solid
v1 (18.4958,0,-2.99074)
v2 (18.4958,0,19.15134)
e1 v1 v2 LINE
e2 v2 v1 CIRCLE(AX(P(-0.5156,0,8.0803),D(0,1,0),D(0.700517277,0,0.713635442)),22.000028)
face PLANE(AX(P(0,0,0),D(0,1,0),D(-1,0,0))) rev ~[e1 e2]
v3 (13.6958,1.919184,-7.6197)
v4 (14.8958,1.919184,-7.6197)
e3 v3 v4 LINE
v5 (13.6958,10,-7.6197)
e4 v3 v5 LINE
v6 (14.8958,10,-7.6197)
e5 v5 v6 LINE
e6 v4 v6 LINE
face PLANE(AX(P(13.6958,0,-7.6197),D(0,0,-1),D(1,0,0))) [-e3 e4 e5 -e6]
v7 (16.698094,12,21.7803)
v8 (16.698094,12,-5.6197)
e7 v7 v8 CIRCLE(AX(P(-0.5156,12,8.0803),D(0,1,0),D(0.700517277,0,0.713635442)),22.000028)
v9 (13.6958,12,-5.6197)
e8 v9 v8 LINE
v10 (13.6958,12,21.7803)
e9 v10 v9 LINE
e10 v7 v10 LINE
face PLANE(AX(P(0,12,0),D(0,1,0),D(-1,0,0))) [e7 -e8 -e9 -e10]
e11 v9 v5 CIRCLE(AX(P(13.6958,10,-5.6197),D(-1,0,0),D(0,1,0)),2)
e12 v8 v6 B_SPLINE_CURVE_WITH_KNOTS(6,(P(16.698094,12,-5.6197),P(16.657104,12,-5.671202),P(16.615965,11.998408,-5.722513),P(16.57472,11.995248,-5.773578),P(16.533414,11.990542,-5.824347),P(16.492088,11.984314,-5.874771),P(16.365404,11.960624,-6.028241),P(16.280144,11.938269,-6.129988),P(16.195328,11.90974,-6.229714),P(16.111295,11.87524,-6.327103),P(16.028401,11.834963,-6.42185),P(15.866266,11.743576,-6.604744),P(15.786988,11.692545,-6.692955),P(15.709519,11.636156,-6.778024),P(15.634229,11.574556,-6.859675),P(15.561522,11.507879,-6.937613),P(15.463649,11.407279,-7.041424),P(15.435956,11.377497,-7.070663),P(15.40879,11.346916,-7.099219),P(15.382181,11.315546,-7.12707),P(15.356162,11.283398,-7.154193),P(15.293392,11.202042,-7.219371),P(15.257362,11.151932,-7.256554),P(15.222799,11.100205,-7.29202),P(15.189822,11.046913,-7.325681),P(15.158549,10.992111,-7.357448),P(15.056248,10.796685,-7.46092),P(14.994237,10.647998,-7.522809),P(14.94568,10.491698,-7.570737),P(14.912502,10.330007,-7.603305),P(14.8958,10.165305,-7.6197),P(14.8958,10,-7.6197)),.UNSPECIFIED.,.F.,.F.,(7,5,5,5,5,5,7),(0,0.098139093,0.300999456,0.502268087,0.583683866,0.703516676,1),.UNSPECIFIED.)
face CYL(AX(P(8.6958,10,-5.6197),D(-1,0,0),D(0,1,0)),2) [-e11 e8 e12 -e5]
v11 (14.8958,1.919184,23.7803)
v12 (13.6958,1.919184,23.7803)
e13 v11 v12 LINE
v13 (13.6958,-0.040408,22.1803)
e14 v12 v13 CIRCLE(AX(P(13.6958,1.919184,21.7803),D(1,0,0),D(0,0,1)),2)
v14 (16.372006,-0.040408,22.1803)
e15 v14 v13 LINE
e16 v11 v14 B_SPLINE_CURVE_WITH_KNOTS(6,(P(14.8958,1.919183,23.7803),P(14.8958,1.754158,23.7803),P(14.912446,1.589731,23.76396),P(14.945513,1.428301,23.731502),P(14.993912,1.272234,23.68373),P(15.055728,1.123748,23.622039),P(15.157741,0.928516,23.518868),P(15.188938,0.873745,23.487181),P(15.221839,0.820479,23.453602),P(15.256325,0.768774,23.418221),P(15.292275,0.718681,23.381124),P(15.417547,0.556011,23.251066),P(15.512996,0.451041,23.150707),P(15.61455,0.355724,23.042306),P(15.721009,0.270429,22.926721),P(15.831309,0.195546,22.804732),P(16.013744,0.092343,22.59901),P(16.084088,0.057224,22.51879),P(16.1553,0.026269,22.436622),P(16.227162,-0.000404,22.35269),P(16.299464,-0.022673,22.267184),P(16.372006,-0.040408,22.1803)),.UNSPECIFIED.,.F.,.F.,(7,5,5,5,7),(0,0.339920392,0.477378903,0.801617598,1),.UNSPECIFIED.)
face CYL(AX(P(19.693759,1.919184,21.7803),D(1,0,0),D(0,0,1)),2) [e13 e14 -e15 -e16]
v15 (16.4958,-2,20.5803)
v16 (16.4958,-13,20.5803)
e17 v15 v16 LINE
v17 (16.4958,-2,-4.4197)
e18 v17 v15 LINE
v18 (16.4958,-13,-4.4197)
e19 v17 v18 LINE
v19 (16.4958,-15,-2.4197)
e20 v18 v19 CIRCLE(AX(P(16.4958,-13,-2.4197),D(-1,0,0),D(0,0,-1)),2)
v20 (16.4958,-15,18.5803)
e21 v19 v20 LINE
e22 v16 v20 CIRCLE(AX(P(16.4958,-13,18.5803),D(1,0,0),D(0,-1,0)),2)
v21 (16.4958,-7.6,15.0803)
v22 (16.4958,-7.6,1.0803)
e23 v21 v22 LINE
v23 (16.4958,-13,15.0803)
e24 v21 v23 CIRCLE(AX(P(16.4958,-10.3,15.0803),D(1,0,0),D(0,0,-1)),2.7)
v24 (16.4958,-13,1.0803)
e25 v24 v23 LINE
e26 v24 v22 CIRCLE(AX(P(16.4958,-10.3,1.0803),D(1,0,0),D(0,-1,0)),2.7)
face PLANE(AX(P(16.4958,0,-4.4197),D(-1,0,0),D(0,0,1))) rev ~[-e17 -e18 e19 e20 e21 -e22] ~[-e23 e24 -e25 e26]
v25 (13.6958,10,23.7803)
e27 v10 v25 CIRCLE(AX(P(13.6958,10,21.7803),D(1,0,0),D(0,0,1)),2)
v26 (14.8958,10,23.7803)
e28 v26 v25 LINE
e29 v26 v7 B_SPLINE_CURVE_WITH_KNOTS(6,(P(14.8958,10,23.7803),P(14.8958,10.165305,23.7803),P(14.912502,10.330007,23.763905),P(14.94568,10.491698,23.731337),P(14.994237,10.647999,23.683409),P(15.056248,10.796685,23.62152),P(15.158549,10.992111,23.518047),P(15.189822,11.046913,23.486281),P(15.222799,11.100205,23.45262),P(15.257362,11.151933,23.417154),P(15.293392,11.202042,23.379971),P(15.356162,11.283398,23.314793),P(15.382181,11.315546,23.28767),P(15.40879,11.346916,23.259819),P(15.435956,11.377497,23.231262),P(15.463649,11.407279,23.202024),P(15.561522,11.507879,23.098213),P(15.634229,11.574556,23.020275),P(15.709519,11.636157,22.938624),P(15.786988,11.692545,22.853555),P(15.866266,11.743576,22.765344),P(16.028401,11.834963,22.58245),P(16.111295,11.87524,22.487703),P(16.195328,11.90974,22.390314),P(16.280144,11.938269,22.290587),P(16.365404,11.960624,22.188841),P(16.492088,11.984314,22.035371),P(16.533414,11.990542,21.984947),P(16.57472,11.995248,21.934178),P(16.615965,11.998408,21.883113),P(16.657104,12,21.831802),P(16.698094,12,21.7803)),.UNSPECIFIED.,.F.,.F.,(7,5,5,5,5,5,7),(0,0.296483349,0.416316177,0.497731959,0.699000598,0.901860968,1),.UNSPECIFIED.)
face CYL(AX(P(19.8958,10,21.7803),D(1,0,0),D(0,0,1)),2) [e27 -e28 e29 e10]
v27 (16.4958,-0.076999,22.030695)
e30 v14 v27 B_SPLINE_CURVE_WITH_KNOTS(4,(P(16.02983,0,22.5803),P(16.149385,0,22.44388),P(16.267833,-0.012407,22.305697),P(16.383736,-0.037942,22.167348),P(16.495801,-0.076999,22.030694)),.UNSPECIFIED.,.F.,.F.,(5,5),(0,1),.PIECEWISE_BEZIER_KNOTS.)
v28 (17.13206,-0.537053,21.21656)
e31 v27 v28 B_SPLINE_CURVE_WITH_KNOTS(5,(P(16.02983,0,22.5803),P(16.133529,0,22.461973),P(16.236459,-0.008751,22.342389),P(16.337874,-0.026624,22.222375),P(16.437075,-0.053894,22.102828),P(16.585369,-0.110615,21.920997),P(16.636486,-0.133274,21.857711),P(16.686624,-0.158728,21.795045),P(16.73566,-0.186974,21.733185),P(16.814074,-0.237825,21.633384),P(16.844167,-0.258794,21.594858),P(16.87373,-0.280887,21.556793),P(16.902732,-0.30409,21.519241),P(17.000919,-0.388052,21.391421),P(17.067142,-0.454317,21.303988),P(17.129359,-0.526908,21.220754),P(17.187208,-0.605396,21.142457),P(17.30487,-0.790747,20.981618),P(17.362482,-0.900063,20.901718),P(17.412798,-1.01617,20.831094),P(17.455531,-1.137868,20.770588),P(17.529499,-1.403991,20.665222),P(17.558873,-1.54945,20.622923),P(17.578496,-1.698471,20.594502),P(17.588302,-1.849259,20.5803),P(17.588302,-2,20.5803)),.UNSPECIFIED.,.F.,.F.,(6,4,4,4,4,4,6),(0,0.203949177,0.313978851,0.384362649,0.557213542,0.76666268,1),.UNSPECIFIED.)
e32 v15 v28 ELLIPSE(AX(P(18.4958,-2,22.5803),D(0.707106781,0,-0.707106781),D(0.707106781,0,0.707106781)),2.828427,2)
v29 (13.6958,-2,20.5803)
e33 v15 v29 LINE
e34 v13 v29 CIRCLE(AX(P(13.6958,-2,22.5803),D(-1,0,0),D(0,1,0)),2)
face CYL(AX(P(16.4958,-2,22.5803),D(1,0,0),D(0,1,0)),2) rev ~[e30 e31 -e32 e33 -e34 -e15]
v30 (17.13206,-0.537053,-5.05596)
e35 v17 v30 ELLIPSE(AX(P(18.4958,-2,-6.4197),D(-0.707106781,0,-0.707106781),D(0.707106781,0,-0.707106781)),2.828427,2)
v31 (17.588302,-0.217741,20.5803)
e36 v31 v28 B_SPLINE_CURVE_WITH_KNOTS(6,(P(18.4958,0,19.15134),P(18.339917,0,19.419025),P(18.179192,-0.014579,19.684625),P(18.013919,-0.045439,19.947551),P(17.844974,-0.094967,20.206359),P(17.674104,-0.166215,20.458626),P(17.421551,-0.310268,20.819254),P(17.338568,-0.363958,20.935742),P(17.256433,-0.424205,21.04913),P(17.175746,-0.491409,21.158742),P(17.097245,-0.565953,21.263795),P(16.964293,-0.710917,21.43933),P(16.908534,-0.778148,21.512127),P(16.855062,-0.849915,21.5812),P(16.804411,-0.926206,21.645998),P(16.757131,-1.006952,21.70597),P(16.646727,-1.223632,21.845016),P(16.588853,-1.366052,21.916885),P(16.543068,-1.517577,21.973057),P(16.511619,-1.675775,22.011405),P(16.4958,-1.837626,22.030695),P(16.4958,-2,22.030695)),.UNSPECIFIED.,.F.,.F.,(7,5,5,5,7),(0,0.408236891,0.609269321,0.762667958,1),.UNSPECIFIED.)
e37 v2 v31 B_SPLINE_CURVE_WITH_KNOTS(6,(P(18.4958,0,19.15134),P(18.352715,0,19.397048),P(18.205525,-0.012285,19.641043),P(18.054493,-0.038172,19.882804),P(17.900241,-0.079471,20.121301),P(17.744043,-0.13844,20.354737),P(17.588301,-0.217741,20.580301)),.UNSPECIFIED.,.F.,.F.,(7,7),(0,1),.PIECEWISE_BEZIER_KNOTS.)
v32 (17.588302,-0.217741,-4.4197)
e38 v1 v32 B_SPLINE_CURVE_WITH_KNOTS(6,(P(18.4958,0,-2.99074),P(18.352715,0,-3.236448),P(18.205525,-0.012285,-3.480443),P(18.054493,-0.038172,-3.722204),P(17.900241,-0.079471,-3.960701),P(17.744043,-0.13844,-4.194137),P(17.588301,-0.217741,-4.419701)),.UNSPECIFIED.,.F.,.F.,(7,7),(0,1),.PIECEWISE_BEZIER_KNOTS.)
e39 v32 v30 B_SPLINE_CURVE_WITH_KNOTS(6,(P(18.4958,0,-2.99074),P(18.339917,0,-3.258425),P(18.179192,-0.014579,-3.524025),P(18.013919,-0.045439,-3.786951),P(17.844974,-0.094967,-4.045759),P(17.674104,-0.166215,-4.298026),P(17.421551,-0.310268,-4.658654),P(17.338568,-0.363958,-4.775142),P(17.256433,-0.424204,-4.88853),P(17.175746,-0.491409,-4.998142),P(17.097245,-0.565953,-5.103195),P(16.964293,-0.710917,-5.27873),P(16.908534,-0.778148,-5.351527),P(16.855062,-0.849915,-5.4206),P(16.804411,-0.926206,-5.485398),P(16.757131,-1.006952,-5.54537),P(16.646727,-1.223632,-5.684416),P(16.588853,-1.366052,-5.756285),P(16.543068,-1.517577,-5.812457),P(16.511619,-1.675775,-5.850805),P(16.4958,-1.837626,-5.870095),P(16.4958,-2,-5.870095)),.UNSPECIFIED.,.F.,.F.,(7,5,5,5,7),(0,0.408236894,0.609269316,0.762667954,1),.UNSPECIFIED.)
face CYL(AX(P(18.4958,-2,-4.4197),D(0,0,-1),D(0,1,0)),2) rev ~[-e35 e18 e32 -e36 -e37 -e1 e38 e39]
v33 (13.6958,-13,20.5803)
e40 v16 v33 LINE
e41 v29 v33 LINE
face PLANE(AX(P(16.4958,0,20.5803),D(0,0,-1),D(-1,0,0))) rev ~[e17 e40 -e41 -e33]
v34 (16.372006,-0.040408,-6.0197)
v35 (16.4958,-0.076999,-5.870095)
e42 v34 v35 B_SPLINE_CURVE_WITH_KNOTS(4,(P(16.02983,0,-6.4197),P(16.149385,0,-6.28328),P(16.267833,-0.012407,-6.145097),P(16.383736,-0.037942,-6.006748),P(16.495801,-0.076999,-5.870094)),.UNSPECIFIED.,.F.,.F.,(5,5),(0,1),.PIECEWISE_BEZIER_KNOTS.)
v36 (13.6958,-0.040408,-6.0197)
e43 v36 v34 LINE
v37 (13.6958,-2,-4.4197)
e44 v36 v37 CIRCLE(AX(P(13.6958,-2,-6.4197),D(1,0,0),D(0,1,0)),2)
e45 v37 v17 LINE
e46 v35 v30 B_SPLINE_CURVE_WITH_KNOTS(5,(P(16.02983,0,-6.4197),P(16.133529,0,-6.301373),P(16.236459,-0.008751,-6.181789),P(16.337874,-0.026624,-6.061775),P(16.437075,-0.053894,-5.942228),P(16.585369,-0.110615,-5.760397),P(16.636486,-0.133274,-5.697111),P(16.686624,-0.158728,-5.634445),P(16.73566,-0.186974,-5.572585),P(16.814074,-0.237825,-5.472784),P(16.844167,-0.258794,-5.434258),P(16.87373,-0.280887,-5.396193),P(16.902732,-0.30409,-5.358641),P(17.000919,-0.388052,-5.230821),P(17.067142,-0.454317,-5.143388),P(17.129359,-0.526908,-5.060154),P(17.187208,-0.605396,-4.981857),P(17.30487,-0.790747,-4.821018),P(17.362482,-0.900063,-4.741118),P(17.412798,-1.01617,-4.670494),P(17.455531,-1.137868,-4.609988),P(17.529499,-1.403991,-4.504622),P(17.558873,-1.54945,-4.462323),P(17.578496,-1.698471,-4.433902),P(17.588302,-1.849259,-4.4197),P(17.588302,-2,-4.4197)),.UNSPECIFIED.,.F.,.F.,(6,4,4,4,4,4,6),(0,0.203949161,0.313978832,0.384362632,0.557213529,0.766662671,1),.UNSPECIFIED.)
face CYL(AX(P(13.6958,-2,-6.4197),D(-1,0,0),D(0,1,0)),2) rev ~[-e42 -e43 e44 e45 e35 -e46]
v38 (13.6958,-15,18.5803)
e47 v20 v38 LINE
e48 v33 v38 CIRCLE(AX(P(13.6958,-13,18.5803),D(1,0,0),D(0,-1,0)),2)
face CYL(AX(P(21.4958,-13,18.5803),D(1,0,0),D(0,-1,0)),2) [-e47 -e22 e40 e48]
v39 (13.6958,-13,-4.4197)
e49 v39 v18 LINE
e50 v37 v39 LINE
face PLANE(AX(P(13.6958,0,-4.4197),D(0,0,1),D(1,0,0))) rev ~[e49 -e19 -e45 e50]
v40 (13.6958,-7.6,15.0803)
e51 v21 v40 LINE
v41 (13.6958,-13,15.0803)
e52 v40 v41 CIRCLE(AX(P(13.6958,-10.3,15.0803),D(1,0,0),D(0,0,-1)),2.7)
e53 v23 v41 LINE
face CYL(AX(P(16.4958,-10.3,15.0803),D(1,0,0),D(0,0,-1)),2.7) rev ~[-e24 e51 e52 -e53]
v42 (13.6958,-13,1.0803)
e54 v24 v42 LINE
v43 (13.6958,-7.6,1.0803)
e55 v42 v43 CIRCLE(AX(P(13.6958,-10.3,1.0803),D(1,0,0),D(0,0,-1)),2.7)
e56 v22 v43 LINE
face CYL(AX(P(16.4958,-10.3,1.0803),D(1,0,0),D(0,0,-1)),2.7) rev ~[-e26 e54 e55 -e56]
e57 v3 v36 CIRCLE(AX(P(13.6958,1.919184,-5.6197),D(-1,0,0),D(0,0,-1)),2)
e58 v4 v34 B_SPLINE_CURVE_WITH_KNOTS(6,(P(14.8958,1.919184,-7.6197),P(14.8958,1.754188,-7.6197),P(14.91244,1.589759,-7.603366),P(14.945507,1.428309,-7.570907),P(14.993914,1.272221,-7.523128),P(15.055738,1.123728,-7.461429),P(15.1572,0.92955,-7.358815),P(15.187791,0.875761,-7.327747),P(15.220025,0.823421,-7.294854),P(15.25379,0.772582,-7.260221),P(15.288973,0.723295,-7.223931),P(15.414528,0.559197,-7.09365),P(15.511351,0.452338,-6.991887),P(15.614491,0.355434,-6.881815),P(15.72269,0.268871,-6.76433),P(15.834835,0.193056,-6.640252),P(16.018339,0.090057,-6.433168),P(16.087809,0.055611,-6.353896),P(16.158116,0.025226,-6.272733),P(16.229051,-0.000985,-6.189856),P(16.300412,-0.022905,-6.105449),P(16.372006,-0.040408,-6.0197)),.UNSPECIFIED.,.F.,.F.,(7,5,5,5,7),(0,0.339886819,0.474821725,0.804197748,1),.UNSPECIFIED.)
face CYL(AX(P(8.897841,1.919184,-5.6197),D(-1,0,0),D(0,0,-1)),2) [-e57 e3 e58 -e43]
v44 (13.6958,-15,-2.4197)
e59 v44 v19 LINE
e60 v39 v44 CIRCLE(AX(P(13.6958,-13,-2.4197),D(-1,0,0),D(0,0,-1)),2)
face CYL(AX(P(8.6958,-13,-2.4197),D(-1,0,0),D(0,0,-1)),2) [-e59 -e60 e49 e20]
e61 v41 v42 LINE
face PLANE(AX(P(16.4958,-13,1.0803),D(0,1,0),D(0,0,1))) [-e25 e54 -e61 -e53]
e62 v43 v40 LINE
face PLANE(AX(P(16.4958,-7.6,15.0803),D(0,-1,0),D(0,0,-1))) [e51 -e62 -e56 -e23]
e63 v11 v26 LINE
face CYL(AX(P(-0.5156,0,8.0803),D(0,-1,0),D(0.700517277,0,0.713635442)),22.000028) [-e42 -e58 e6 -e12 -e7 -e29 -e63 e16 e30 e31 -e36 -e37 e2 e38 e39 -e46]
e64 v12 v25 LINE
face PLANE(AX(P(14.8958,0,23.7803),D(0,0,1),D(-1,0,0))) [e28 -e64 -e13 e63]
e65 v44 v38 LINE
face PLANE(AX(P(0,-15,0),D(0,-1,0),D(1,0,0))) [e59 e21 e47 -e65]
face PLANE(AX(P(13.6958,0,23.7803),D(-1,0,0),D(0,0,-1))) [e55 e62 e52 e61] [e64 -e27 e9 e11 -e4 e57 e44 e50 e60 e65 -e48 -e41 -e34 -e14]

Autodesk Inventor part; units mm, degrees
ref_plane "YZ Plane" through (0, 0, 0) normal (1, 0, 0) x (0, 1, 0)
ref_plane "XZ Plane" through (0, 0, 0) normal (0, 1, 0) x (-1, 0, 0)
ref_plane "XY Plane" through (0, 0, 0) normal (0, 0, 1) x (1, 0, 0)
sketch "Boceto1" plane through (0, 0, 0) normal (0, 1, 0) x (-1, 0, 0)
  line L0 (-14.8958, 23.7803) -> (7.8042, 23.7803)
  line L1 (7.8042, 23.7803) -> (7.8042, -7.6197)
  line L2 (7.8042, -7.6197) -> (-14.8958, -7.6197)
  line L3 (-14.8958, -7.6197) -> (-14.8958, 23.7803)
  line L4 (-14.8958, 23.7803) -> (7.8042, -7.6197) construction
  line L5 (7.8042, 23.7803) -> (-14.8958, -7.6197) construction
  arc A0 (-14.8958, 23.7803) -> (-14.8958, -7.6197) centre (0.5156, 8.0803) ccw
  line L6 (7.8042, 17.8112) -> (7.8042, 23.7803)
  line L7 (-13.6958, 20.5803) -> (6.6042, 20.5803)
  line L8 (6.6042, 20.5803) -> (6.6042, -4.4197)
  line L9 (6.6042, -4.4197) -> (-13.6958, -4.4197)
  line L10 (-13.6958, -4.4197) -> (-13.6958, 20.5803)
  line L11 (-13.6958, 20.5803) -> (6.6042, -4.4197) construction
  line L12 (6.6042, 20.5803) -> (-13.6958, -4.4197) construction
  line L13 (7.8042, 23.7803) -> (11.6042, 23.7803)
  line L14 (11.6042, 23.7803) -> (11.6042, -7.6197)
  line L15 (11.6042, -7.6197) -> (7.8042, -7.6197)
  line L16 (7.8042, -7.6197) -> (7.8042, 23.7803)
  line L17 (7.8042, 23.7803) -> (6.6042, 23.7803)
  line L18 (6.6042, 23.7803) -> (6.6042, -7.6197)
  line L19 (6.6042, -7.6197) -> (7.8042, -7.6197)
  line L20 (7.8042, -7.6197) -> (7.8042, 23.7803)
  line L21 (11.6042, -7.6197) -> (6.6042, -7.6197)
  line L22 (6.6042, -7.6197) -> (6.6042, -4.4197)
  line L23 (6.6042, -4.4197) -> (11.6042, -4.4197)
  line L24 (11.6042, -4.4197) -> (11.6042, -7.6197)
  line L25 (11.6042, 23.7803) -> (6.6042, 23.7803)
  line L26 (6.6042, 23.7803) -> (6.6042, 20.5803)
  line L27 (6.6042, 20.5803) -> (11.6042, 20.5803)
  line L28 (11.6042, 20.5803) -> (11.6042, 23.7803)
  line L29 (-14.8958, 23.7803) -> (-13.6958, 23.7803)
  line L30 (-13.6958, 23.7803) -> (-13.6958, -7.6197)
  line L31 (-13.6958, -7.6197) -> (-14.8958, -7.6197)
  line L32 (-14.8958, -7.6197) -> (-14.8958, 23.7803)
  point P0 (-3.5458, 8.0803)
  point P1 (6.6042, -4.4197)
  point P2 (6.6042, 20.5803)
  point P3 (6.6042, 23.7803)
  point P4 (6.6042, 20.5803)
  point P5 (11.6042, -4.4197)
  point P6 (6.6042, -4.4197)
  dimension "d4" = 25
  dimension "d5" = 3.2
  dimension "d6" = 1.2
  dimension "d7" = 20.3
  dimension "d14" = 5
  dimension "d34" = 22
extrude "Extrusión1" add sketch "Boceto1" along normal blind 12 contours L0 L30 L10 L2 L3 | L3 A0
sketch "Boceto3" plane through (0, 0, 0) normal (0, -1, 0) x (1, 0, 0)
  line L0 (10.8958, -4.4197) -> (16.4958, -4.4197)
  line L1 (16.4958, -4.4197) -> (16.4958, 20.5803)
  line L2 (16.4958, 20.5803) -> (10.8958, 20.5803)
  line L3 (10.8958, 20.5803) -> (10.8958, -4.4197)
  line L4 (13.6958, -7.6197) -> (13.6958, 23.7803) projected
  line L5 (10.8958, -4.4197) -> (16.4958, 20.5803) construction
  line L6 (16.4958, -4.4197) -> (10.8958, 20.5803) construction
  point P0 (0, 0)
  point P1 (13.6958, 8.0803)
  point P2 (13.6958, 20.5803)
  point P3 (13.6958, -4.4197)
  dimension "d18" = 25
  dimension "d19" = 2.8
extrude "Extrusión3" add sketch "Boceto3" along normal blind 15 contours L4 L2 L1 L0
fillet "Empalme2" radius 2 9 edges at (15.0958, 0, 20.5803) (15.0958, -15, 20.5803) (15.0958, -15, -4.4197) (15.0958, 0, -4.4197) (14.2958, 0, -7.6197) (14.2958, 12, -7.6197) (14.2958, 0, 23.7803) (14.2958, 12, 23.7803) (16.4958, 0, 8.0803)
sketch "Boceto4" plane through (16.4958, -13, -4.4197) normal (1, 0, 0) x (0, 0, -1)
  circle A0 centre (-19.5, 2.7) radius 2.7
  circle A1 centre (-5.5, 2.7) radius 2.7
  line L0 (-19.5, 5.4) -> (-5.5, 5.4)
  line L1 (-5.5, 5.4) -> (-5.5, 0)
  line L2 (-5.5, 0) -> (-19.5, 0)
  line L3 (-19.5, 0) -> (-19.5, 5.4)
  line L4 (-25, 11) -> (-25, 0) projected
  line L5 (0, 11) -> (0, 0) projected
  line L6 (-2, -2) -> (-23, -2) projected
  point P0 (-4.4197, 13)
  point P1 (-5.5, 0)
  point P2 (-5.5, 5.4)
  point P3 (-19.5, 5.4)
  dimension "d23" = 5.4
  dimension "d24" = 5.5
  dimension "d25" = 5.5
  dimension "d26" = 2
extrude "Extrusión4" cut sketch "Boceto4" against normal through all
sketch "Boceto5" plane through (16.4958, -13, -4.4197) normal (1, 0, 0) x (0, 0, -1)
  arc A0 (-5.5, 0) -> (-5.5, 5.4) centre (-5.5, 2.7) ccw projected
  line L0 (-5.5, 0) -> (-19.5, 0) projected
  arc A1 (-19.5, 5.4) -> (-19.5, 0) centre (-19.5, 2.7) ccw projected
  line L1 (-19.5, 5.4) -> (-5.5, 5.4) projected
  arc A2 (-2, -2) -> (0, 0) centre (-2, 0) ccw projected
  line L2 (0, 11) -> (0, 0) projected
  line L3 (-25, 11) -> (0, 11) projected
  line L4 (-25, 11) -> (-25, 0) projected
  arc A3 (-25, 0) -> (-23, -2) centre (-23, 0) ccw projected
  line L5 (-2, -2) -> (-23, -2) projected
  arc A4 (-5.5, -2) -> (-5.5, 7.4) centre (-5.5, 2.7) ccw
  line L6 (-5.5, -2) -> (-19.5, -2)
  arc A5 (-19.5, 7.4) -> (-19.5, -2) centre (-19.5, 2.7) ccw
  line L7 (-19.5, 7.4) -> (-5.5, 7.4)
  point P0 (-4.4197, 13)
  point P1 (-21.3974, 7)
  point P2 (-19.5, -2)
  point P3 (-5.5, -2)
  point P4 (-3.6026, 7)
  dimension "d29" = 2
sketch "Boceto2" plane through (-6.6042, 0, 23.7803) normal (0, 0, 1) x (1, 0, 0)
  circle A0 centre (2.3, 6) radius 2.7
  line L0 (-5, 0) -> (21.5, 0) projected
  circle A1 centre (10.3, 6) radius 2.7
  line L1 (2.3, 3.3) -> (10.3, 3.3)
  line L2 (10.3, 3.3) -> (10.3, 8.7)
  line L3 (10.3, 8.7) -> (2.3, 8.7)
  line L4 (2.3, 8.7) -> (2.3, 3.3)
  point P0 (6.6042, 0)
  point P1 (20.3, 0)
  dimension "d10" = 5.4
  dimension "d11" = 6
  dimension "d12" = 10
  dimension "d13" = 8
properties part number "yystop"
